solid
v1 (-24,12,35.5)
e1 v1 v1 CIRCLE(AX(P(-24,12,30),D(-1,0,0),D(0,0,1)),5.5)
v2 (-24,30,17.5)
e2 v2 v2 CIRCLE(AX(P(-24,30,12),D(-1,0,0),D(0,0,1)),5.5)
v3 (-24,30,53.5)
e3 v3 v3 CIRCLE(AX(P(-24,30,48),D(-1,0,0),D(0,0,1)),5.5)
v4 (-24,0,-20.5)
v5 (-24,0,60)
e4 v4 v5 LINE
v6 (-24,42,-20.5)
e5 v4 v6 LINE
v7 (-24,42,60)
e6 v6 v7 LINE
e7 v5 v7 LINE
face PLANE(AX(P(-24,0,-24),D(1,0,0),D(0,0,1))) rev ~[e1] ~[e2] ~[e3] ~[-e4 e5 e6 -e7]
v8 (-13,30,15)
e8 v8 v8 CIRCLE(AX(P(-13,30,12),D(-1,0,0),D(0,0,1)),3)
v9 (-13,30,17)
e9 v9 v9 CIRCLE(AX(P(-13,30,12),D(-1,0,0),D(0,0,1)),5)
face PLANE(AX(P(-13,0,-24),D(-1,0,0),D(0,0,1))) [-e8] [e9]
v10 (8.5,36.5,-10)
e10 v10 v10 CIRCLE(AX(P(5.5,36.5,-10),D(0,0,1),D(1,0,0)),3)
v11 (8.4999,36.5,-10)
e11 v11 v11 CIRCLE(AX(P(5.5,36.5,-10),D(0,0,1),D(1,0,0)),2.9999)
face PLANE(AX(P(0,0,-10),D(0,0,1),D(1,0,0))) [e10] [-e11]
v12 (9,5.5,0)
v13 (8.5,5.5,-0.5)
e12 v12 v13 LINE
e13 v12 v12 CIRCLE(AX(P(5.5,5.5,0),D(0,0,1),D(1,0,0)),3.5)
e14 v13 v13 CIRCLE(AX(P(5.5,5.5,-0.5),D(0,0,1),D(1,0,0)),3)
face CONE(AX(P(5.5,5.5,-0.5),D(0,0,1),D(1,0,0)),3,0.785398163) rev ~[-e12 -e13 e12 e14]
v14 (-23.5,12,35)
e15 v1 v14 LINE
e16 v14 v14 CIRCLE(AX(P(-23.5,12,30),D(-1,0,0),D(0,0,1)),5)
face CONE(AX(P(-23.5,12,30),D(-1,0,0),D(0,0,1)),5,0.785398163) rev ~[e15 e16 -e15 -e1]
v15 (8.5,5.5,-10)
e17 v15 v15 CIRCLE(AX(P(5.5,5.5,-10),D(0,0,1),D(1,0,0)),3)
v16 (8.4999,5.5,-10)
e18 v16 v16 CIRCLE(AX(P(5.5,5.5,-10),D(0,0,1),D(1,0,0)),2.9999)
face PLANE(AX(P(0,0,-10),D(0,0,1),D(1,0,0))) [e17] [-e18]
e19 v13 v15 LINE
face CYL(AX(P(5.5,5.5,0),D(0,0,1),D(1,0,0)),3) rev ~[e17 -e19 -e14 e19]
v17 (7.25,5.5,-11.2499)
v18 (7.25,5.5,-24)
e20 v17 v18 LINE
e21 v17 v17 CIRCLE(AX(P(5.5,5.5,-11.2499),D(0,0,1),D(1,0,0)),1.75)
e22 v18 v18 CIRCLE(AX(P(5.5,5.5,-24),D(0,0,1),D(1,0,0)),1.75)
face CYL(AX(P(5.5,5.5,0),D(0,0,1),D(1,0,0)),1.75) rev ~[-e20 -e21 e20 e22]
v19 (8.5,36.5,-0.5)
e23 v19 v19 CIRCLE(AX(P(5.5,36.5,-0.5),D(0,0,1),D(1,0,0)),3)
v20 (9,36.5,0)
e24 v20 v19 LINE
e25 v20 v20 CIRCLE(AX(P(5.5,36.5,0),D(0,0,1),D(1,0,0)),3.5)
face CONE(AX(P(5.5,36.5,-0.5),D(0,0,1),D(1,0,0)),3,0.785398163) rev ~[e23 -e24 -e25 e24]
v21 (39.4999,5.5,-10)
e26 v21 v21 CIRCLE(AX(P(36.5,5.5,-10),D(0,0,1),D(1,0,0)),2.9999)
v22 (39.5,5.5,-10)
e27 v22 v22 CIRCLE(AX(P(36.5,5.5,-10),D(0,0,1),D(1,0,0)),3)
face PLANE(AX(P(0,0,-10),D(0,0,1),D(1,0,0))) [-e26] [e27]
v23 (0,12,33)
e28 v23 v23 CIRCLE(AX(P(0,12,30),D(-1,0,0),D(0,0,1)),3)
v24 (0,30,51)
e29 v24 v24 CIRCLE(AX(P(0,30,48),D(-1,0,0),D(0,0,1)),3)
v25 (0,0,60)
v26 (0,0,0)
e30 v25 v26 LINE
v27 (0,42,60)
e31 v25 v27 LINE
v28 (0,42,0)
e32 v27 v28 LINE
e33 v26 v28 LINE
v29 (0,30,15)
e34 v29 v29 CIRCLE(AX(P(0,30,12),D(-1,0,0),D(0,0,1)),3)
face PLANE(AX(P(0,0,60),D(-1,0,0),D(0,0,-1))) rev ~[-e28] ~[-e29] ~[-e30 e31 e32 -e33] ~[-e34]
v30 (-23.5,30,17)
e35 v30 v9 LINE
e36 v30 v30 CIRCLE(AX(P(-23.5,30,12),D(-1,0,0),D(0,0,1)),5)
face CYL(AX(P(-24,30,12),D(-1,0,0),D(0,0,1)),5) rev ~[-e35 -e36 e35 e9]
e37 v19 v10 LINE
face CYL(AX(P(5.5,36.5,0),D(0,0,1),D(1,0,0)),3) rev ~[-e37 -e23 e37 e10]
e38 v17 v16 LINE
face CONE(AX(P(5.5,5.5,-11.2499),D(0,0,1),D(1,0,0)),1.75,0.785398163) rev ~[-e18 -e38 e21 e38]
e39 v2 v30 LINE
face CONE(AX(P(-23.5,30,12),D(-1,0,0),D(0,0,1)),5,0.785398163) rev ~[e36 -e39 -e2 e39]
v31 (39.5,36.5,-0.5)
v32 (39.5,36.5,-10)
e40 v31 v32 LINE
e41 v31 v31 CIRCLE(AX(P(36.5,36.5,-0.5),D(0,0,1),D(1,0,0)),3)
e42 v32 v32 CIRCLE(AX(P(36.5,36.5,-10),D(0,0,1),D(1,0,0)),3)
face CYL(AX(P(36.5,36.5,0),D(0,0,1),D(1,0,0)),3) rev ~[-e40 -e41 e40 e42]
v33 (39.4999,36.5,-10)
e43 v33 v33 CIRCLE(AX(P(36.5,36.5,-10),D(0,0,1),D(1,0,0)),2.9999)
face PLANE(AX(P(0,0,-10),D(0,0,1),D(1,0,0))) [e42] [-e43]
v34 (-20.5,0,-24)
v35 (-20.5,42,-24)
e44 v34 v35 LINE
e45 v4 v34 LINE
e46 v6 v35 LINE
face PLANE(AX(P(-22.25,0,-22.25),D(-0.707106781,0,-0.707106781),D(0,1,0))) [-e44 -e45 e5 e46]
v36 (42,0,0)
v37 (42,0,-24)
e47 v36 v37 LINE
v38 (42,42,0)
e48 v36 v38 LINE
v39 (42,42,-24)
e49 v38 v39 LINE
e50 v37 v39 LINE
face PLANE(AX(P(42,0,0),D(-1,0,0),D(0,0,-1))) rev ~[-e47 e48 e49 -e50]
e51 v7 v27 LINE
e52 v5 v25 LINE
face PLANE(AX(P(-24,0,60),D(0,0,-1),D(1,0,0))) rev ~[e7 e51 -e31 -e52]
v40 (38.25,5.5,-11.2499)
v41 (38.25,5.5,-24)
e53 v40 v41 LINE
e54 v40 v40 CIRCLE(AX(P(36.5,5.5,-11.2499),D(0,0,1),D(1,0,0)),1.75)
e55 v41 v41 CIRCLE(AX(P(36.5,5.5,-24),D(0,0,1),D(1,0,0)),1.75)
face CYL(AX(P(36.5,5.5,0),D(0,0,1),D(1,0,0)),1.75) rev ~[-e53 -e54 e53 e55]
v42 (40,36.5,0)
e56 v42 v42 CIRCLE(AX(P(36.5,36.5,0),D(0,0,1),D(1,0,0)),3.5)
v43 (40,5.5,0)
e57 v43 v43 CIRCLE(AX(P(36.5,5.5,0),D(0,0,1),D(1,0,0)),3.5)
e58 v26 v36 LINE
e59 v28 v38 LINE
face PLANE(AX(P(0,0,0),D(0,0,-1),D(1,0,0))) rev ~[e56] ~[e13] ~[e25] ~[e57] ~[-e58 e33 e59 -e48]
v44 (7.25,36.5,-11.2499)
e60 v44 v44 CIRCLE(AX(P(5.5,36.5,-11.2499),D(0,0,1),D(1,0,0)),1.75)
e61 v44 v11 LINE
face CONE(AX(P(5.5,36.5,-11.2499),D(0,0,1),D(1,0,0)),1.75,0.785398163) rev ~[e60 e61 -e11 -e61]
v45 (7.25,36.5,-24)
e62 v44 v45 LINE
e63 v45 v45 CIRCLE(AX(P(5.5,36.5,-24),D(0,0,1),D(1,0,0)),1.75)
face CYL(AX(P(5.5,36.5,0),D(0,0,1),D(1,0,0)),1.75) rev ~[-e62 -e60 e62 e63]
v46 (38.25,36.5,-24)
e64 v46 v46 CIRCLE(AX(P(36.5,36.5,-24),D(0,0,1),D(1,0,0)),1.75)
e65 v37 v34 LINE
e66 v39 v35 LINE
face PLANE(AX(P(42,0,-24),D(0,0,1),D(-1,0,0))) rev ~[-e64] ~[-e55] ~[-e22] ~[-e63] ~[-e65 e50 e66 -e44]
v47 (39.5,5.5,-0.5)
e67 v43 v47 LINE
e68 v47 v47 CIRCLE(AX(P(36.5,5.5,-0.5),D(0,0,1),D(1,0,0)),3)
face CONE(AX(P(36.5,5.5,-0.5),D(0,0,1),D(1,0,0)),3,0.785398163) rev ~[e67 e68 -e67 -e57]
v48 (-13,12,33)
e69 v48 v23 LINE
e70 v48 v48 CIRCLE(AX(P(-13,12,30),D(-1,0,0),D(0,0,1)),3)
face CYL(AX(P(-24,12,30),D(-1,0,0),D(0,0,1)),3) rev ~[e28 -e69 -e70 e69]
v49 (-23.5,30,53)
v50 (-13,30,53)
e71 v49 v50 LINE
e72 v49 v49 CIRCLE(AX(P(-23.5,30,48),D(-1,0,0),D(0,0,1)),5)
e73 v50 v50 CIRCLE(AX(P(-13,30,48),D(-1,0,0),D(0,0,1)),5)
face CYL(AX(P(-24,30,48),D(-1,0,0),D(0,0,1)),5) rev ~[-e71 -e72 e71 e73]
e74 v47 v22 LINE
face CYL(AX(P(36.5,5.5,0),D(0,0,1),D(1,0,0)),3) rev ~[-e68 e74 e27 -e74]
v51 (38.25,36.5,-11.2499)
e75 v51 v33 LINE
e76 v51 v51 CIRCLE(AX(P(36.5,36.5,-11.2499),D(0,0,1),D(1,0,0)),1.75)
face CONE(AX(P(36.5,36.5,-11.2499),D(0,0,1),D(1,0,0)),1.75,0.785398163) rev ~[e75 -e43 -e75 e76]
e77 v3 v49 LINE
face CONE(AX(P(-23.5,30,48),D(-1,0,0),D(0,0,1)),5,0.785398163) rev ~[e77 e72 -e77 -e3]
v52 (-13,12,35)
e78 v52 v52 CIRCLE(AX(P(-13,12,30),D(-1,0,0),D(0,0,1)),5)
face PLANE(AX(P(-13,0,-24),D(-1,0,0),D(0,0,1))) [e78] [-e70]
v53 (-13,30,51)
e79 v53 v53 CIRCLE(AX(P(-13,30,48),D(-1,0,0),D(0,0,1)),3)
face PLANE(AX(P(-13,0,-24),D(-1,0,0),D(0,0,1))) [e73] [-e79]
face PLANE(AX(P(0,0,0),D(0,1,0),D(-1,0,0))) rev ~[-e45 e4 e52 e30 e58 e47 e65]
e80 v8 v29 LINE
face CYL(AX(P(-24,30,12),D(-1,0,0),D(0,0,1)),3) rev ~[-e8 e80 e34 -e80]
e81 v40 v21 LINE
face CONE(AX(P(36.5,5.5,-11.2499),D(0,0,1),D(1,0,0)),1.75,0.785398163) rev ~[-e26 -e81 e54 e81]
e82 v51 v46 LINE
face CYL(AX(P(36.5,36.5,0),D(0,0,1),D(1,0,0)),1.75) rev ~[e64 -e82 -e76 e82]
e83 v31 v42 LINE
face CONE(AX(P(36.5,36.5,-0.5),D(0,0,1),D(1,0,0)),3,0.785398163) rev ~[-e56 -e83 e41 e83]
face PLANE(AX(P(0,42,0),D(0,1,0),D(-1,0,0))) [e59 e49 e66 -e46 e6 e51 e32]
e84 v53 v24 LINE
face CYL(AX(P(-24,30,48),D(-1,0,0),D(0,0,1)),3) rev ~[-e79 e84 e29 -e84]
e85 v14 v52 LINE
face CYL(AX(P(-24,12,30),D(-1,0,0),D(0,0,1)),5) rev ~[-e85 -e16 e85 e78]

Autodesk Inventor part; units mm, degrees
ref_plane "YZ Plane" through (0, 0, 0) normal (1, 0, 0) x (0, 1, 0)
ref_plane "XZ Plane" through (0, 0, 0) normal (0, 1, 0) x (-1, 0, 0)
ref_plane "XY Plane" through (0, 0, 0) normal (0, 0, 1) x (1, 0, 0)
sketch "Sketch1" plane through (0, 0, 0) normal (0, 1, 0) x (-1, 0, 0)
  line L0 (0, 0) -> (-42, 0)
  line L1 (-42, 0) -> (-42, -24)
  line L2 (-42, -24) -> (24, -24)
  line L3 (24, -24) -> (24, 60)
  line L4 (24, 60) -> (0, 60)
  line L5 (0, 60) -> (0, 0)
  dimension "d0" = 24
  dimension "d1" = 42
  dimension "d2" = 24
  dimension "d3" = 60
extrude "Extrusion1" add sketch "Sketch1" along normal blind 42
sketch "Sketch2" plane through (0, 0, 0) normal (0, 0, 1) x (1, 0, 0)
  circle A0 centre (5.5, 36.5) radius 1.75
  circle A1 centre (36.5, 36.5) radius 1.75
  circle A2 centre (36.5, 5.5) radius 1.75
  circle A3 centre (5.5, 5.5) radius 1.75
  line L0 (42, 0) -> (42, 42) projected
  line L1 (0, 42) -> (42, 42) projected
  point P0 (0, 0)
  dimension "d6" = 3.5
  dimension "d7" = 5.5
  dimension "d8" = 5.5
  dimension "d9" = 31
  dimension "d10" = 31
extrude "Extrusion2" cut sketch "Sketch2" against normal blind 42
sketch "Sketch3" plane through (0, 0, 60) normal (1, 0, 0) x (0, 0, -1)
  circle A0 centre (12, 30) radius 5
  circle A1 centre (30, 12) radius 5
  circle A2 centre (48, 30) radius 5
  line L0 (12, 30) -> (30, 12) construction
  line L1 (30, 12) -> (48, 30) construction
  line L2 (0, 42) -> (60, 42) construction
  line L3 (0, 0) -> (0, 42) construction
  line L4 (0, 0) -> (60, 0) construction
  line L5 (60, 0) -> (60, 42) construction
  dimension "d13" = 12
  dimension "d14" = 12
  dimension "d15" = 12
  dimension "d16" = 10
  dimension "d17" = 12
sketch "Sketch4" plane through (-24, 0, -24) normal (-1, 0, 0) x (0, 0, 1)
  circle A0 centre (54, 12) radius 5 projected
  circle A1 centre (36, 30) radius 5 projected
  circle A2 centre (72, 30) radius 5 projected
  circle A3 centre (54, 12) radius 3
  circle A4 centre (36, 30) radius 3
  circle A5 centre (72, 30) radius 3
  point P0 (24, 0)
  dimension "d20" = 6
extrude "Extrusion3" cut sketch "Sketch4" against normal blind 11 contours A0 | A1 | A2 | A3 | A4 | A5
extrude "Extrusion4" cut sketch "Sketch4" against normal blind 32.5 contours A3 | A4 | A5
sketch "Sketch6" plane through (0, 0, 0) normal (0, 0, 1) x (1, 0, 0)
  circle A0 centre (36.5, 5.5) radius 1.75 construction
  circle A1 centre (5.5, 5.5) radius 1.75 construction
  circle A2 centre (5.5, 36.5) radius 1.75 construction
  circle A3 centre (36.5, 36.5) radius 1.75 construction
  circle A4 centre (36.5, 5.5) radius 3
  circle A5 centre (5.5, 5.5) radius 3
  circle A6 centre (5.5, 36.5) radius 3
  circle A7 centre (36.5, 36.5) radius 3
  point P0 (0, 0)
  dimension "d23" = 6
extrude "Extrusion5" cut sketch "Sketch6" against normal blind 10
chamfer "Chamfer1" distance 1.25 angle 45 4 edges at (3.75, 5.5, -10) (3.75, 36.5, -10) (34.75, 36.5, -10) (34.75, 5.5, -10)
chamfer "Chamfer2" distance 0.5 angle 45 7 edges at (33.5, 5.5, 0) (2.5, 5.5, 0) (2.5, 36.5, 0) (33.5, 36.5, 0) (-24, 12, 25) (-24, 30, 7) (-24, 30, 43)
chamfer "Chamfer3" distance 3.5 angle 45 1 edges at (-24, 21, -24)
properties part number "XaxisMotorMount_3DPrint"
